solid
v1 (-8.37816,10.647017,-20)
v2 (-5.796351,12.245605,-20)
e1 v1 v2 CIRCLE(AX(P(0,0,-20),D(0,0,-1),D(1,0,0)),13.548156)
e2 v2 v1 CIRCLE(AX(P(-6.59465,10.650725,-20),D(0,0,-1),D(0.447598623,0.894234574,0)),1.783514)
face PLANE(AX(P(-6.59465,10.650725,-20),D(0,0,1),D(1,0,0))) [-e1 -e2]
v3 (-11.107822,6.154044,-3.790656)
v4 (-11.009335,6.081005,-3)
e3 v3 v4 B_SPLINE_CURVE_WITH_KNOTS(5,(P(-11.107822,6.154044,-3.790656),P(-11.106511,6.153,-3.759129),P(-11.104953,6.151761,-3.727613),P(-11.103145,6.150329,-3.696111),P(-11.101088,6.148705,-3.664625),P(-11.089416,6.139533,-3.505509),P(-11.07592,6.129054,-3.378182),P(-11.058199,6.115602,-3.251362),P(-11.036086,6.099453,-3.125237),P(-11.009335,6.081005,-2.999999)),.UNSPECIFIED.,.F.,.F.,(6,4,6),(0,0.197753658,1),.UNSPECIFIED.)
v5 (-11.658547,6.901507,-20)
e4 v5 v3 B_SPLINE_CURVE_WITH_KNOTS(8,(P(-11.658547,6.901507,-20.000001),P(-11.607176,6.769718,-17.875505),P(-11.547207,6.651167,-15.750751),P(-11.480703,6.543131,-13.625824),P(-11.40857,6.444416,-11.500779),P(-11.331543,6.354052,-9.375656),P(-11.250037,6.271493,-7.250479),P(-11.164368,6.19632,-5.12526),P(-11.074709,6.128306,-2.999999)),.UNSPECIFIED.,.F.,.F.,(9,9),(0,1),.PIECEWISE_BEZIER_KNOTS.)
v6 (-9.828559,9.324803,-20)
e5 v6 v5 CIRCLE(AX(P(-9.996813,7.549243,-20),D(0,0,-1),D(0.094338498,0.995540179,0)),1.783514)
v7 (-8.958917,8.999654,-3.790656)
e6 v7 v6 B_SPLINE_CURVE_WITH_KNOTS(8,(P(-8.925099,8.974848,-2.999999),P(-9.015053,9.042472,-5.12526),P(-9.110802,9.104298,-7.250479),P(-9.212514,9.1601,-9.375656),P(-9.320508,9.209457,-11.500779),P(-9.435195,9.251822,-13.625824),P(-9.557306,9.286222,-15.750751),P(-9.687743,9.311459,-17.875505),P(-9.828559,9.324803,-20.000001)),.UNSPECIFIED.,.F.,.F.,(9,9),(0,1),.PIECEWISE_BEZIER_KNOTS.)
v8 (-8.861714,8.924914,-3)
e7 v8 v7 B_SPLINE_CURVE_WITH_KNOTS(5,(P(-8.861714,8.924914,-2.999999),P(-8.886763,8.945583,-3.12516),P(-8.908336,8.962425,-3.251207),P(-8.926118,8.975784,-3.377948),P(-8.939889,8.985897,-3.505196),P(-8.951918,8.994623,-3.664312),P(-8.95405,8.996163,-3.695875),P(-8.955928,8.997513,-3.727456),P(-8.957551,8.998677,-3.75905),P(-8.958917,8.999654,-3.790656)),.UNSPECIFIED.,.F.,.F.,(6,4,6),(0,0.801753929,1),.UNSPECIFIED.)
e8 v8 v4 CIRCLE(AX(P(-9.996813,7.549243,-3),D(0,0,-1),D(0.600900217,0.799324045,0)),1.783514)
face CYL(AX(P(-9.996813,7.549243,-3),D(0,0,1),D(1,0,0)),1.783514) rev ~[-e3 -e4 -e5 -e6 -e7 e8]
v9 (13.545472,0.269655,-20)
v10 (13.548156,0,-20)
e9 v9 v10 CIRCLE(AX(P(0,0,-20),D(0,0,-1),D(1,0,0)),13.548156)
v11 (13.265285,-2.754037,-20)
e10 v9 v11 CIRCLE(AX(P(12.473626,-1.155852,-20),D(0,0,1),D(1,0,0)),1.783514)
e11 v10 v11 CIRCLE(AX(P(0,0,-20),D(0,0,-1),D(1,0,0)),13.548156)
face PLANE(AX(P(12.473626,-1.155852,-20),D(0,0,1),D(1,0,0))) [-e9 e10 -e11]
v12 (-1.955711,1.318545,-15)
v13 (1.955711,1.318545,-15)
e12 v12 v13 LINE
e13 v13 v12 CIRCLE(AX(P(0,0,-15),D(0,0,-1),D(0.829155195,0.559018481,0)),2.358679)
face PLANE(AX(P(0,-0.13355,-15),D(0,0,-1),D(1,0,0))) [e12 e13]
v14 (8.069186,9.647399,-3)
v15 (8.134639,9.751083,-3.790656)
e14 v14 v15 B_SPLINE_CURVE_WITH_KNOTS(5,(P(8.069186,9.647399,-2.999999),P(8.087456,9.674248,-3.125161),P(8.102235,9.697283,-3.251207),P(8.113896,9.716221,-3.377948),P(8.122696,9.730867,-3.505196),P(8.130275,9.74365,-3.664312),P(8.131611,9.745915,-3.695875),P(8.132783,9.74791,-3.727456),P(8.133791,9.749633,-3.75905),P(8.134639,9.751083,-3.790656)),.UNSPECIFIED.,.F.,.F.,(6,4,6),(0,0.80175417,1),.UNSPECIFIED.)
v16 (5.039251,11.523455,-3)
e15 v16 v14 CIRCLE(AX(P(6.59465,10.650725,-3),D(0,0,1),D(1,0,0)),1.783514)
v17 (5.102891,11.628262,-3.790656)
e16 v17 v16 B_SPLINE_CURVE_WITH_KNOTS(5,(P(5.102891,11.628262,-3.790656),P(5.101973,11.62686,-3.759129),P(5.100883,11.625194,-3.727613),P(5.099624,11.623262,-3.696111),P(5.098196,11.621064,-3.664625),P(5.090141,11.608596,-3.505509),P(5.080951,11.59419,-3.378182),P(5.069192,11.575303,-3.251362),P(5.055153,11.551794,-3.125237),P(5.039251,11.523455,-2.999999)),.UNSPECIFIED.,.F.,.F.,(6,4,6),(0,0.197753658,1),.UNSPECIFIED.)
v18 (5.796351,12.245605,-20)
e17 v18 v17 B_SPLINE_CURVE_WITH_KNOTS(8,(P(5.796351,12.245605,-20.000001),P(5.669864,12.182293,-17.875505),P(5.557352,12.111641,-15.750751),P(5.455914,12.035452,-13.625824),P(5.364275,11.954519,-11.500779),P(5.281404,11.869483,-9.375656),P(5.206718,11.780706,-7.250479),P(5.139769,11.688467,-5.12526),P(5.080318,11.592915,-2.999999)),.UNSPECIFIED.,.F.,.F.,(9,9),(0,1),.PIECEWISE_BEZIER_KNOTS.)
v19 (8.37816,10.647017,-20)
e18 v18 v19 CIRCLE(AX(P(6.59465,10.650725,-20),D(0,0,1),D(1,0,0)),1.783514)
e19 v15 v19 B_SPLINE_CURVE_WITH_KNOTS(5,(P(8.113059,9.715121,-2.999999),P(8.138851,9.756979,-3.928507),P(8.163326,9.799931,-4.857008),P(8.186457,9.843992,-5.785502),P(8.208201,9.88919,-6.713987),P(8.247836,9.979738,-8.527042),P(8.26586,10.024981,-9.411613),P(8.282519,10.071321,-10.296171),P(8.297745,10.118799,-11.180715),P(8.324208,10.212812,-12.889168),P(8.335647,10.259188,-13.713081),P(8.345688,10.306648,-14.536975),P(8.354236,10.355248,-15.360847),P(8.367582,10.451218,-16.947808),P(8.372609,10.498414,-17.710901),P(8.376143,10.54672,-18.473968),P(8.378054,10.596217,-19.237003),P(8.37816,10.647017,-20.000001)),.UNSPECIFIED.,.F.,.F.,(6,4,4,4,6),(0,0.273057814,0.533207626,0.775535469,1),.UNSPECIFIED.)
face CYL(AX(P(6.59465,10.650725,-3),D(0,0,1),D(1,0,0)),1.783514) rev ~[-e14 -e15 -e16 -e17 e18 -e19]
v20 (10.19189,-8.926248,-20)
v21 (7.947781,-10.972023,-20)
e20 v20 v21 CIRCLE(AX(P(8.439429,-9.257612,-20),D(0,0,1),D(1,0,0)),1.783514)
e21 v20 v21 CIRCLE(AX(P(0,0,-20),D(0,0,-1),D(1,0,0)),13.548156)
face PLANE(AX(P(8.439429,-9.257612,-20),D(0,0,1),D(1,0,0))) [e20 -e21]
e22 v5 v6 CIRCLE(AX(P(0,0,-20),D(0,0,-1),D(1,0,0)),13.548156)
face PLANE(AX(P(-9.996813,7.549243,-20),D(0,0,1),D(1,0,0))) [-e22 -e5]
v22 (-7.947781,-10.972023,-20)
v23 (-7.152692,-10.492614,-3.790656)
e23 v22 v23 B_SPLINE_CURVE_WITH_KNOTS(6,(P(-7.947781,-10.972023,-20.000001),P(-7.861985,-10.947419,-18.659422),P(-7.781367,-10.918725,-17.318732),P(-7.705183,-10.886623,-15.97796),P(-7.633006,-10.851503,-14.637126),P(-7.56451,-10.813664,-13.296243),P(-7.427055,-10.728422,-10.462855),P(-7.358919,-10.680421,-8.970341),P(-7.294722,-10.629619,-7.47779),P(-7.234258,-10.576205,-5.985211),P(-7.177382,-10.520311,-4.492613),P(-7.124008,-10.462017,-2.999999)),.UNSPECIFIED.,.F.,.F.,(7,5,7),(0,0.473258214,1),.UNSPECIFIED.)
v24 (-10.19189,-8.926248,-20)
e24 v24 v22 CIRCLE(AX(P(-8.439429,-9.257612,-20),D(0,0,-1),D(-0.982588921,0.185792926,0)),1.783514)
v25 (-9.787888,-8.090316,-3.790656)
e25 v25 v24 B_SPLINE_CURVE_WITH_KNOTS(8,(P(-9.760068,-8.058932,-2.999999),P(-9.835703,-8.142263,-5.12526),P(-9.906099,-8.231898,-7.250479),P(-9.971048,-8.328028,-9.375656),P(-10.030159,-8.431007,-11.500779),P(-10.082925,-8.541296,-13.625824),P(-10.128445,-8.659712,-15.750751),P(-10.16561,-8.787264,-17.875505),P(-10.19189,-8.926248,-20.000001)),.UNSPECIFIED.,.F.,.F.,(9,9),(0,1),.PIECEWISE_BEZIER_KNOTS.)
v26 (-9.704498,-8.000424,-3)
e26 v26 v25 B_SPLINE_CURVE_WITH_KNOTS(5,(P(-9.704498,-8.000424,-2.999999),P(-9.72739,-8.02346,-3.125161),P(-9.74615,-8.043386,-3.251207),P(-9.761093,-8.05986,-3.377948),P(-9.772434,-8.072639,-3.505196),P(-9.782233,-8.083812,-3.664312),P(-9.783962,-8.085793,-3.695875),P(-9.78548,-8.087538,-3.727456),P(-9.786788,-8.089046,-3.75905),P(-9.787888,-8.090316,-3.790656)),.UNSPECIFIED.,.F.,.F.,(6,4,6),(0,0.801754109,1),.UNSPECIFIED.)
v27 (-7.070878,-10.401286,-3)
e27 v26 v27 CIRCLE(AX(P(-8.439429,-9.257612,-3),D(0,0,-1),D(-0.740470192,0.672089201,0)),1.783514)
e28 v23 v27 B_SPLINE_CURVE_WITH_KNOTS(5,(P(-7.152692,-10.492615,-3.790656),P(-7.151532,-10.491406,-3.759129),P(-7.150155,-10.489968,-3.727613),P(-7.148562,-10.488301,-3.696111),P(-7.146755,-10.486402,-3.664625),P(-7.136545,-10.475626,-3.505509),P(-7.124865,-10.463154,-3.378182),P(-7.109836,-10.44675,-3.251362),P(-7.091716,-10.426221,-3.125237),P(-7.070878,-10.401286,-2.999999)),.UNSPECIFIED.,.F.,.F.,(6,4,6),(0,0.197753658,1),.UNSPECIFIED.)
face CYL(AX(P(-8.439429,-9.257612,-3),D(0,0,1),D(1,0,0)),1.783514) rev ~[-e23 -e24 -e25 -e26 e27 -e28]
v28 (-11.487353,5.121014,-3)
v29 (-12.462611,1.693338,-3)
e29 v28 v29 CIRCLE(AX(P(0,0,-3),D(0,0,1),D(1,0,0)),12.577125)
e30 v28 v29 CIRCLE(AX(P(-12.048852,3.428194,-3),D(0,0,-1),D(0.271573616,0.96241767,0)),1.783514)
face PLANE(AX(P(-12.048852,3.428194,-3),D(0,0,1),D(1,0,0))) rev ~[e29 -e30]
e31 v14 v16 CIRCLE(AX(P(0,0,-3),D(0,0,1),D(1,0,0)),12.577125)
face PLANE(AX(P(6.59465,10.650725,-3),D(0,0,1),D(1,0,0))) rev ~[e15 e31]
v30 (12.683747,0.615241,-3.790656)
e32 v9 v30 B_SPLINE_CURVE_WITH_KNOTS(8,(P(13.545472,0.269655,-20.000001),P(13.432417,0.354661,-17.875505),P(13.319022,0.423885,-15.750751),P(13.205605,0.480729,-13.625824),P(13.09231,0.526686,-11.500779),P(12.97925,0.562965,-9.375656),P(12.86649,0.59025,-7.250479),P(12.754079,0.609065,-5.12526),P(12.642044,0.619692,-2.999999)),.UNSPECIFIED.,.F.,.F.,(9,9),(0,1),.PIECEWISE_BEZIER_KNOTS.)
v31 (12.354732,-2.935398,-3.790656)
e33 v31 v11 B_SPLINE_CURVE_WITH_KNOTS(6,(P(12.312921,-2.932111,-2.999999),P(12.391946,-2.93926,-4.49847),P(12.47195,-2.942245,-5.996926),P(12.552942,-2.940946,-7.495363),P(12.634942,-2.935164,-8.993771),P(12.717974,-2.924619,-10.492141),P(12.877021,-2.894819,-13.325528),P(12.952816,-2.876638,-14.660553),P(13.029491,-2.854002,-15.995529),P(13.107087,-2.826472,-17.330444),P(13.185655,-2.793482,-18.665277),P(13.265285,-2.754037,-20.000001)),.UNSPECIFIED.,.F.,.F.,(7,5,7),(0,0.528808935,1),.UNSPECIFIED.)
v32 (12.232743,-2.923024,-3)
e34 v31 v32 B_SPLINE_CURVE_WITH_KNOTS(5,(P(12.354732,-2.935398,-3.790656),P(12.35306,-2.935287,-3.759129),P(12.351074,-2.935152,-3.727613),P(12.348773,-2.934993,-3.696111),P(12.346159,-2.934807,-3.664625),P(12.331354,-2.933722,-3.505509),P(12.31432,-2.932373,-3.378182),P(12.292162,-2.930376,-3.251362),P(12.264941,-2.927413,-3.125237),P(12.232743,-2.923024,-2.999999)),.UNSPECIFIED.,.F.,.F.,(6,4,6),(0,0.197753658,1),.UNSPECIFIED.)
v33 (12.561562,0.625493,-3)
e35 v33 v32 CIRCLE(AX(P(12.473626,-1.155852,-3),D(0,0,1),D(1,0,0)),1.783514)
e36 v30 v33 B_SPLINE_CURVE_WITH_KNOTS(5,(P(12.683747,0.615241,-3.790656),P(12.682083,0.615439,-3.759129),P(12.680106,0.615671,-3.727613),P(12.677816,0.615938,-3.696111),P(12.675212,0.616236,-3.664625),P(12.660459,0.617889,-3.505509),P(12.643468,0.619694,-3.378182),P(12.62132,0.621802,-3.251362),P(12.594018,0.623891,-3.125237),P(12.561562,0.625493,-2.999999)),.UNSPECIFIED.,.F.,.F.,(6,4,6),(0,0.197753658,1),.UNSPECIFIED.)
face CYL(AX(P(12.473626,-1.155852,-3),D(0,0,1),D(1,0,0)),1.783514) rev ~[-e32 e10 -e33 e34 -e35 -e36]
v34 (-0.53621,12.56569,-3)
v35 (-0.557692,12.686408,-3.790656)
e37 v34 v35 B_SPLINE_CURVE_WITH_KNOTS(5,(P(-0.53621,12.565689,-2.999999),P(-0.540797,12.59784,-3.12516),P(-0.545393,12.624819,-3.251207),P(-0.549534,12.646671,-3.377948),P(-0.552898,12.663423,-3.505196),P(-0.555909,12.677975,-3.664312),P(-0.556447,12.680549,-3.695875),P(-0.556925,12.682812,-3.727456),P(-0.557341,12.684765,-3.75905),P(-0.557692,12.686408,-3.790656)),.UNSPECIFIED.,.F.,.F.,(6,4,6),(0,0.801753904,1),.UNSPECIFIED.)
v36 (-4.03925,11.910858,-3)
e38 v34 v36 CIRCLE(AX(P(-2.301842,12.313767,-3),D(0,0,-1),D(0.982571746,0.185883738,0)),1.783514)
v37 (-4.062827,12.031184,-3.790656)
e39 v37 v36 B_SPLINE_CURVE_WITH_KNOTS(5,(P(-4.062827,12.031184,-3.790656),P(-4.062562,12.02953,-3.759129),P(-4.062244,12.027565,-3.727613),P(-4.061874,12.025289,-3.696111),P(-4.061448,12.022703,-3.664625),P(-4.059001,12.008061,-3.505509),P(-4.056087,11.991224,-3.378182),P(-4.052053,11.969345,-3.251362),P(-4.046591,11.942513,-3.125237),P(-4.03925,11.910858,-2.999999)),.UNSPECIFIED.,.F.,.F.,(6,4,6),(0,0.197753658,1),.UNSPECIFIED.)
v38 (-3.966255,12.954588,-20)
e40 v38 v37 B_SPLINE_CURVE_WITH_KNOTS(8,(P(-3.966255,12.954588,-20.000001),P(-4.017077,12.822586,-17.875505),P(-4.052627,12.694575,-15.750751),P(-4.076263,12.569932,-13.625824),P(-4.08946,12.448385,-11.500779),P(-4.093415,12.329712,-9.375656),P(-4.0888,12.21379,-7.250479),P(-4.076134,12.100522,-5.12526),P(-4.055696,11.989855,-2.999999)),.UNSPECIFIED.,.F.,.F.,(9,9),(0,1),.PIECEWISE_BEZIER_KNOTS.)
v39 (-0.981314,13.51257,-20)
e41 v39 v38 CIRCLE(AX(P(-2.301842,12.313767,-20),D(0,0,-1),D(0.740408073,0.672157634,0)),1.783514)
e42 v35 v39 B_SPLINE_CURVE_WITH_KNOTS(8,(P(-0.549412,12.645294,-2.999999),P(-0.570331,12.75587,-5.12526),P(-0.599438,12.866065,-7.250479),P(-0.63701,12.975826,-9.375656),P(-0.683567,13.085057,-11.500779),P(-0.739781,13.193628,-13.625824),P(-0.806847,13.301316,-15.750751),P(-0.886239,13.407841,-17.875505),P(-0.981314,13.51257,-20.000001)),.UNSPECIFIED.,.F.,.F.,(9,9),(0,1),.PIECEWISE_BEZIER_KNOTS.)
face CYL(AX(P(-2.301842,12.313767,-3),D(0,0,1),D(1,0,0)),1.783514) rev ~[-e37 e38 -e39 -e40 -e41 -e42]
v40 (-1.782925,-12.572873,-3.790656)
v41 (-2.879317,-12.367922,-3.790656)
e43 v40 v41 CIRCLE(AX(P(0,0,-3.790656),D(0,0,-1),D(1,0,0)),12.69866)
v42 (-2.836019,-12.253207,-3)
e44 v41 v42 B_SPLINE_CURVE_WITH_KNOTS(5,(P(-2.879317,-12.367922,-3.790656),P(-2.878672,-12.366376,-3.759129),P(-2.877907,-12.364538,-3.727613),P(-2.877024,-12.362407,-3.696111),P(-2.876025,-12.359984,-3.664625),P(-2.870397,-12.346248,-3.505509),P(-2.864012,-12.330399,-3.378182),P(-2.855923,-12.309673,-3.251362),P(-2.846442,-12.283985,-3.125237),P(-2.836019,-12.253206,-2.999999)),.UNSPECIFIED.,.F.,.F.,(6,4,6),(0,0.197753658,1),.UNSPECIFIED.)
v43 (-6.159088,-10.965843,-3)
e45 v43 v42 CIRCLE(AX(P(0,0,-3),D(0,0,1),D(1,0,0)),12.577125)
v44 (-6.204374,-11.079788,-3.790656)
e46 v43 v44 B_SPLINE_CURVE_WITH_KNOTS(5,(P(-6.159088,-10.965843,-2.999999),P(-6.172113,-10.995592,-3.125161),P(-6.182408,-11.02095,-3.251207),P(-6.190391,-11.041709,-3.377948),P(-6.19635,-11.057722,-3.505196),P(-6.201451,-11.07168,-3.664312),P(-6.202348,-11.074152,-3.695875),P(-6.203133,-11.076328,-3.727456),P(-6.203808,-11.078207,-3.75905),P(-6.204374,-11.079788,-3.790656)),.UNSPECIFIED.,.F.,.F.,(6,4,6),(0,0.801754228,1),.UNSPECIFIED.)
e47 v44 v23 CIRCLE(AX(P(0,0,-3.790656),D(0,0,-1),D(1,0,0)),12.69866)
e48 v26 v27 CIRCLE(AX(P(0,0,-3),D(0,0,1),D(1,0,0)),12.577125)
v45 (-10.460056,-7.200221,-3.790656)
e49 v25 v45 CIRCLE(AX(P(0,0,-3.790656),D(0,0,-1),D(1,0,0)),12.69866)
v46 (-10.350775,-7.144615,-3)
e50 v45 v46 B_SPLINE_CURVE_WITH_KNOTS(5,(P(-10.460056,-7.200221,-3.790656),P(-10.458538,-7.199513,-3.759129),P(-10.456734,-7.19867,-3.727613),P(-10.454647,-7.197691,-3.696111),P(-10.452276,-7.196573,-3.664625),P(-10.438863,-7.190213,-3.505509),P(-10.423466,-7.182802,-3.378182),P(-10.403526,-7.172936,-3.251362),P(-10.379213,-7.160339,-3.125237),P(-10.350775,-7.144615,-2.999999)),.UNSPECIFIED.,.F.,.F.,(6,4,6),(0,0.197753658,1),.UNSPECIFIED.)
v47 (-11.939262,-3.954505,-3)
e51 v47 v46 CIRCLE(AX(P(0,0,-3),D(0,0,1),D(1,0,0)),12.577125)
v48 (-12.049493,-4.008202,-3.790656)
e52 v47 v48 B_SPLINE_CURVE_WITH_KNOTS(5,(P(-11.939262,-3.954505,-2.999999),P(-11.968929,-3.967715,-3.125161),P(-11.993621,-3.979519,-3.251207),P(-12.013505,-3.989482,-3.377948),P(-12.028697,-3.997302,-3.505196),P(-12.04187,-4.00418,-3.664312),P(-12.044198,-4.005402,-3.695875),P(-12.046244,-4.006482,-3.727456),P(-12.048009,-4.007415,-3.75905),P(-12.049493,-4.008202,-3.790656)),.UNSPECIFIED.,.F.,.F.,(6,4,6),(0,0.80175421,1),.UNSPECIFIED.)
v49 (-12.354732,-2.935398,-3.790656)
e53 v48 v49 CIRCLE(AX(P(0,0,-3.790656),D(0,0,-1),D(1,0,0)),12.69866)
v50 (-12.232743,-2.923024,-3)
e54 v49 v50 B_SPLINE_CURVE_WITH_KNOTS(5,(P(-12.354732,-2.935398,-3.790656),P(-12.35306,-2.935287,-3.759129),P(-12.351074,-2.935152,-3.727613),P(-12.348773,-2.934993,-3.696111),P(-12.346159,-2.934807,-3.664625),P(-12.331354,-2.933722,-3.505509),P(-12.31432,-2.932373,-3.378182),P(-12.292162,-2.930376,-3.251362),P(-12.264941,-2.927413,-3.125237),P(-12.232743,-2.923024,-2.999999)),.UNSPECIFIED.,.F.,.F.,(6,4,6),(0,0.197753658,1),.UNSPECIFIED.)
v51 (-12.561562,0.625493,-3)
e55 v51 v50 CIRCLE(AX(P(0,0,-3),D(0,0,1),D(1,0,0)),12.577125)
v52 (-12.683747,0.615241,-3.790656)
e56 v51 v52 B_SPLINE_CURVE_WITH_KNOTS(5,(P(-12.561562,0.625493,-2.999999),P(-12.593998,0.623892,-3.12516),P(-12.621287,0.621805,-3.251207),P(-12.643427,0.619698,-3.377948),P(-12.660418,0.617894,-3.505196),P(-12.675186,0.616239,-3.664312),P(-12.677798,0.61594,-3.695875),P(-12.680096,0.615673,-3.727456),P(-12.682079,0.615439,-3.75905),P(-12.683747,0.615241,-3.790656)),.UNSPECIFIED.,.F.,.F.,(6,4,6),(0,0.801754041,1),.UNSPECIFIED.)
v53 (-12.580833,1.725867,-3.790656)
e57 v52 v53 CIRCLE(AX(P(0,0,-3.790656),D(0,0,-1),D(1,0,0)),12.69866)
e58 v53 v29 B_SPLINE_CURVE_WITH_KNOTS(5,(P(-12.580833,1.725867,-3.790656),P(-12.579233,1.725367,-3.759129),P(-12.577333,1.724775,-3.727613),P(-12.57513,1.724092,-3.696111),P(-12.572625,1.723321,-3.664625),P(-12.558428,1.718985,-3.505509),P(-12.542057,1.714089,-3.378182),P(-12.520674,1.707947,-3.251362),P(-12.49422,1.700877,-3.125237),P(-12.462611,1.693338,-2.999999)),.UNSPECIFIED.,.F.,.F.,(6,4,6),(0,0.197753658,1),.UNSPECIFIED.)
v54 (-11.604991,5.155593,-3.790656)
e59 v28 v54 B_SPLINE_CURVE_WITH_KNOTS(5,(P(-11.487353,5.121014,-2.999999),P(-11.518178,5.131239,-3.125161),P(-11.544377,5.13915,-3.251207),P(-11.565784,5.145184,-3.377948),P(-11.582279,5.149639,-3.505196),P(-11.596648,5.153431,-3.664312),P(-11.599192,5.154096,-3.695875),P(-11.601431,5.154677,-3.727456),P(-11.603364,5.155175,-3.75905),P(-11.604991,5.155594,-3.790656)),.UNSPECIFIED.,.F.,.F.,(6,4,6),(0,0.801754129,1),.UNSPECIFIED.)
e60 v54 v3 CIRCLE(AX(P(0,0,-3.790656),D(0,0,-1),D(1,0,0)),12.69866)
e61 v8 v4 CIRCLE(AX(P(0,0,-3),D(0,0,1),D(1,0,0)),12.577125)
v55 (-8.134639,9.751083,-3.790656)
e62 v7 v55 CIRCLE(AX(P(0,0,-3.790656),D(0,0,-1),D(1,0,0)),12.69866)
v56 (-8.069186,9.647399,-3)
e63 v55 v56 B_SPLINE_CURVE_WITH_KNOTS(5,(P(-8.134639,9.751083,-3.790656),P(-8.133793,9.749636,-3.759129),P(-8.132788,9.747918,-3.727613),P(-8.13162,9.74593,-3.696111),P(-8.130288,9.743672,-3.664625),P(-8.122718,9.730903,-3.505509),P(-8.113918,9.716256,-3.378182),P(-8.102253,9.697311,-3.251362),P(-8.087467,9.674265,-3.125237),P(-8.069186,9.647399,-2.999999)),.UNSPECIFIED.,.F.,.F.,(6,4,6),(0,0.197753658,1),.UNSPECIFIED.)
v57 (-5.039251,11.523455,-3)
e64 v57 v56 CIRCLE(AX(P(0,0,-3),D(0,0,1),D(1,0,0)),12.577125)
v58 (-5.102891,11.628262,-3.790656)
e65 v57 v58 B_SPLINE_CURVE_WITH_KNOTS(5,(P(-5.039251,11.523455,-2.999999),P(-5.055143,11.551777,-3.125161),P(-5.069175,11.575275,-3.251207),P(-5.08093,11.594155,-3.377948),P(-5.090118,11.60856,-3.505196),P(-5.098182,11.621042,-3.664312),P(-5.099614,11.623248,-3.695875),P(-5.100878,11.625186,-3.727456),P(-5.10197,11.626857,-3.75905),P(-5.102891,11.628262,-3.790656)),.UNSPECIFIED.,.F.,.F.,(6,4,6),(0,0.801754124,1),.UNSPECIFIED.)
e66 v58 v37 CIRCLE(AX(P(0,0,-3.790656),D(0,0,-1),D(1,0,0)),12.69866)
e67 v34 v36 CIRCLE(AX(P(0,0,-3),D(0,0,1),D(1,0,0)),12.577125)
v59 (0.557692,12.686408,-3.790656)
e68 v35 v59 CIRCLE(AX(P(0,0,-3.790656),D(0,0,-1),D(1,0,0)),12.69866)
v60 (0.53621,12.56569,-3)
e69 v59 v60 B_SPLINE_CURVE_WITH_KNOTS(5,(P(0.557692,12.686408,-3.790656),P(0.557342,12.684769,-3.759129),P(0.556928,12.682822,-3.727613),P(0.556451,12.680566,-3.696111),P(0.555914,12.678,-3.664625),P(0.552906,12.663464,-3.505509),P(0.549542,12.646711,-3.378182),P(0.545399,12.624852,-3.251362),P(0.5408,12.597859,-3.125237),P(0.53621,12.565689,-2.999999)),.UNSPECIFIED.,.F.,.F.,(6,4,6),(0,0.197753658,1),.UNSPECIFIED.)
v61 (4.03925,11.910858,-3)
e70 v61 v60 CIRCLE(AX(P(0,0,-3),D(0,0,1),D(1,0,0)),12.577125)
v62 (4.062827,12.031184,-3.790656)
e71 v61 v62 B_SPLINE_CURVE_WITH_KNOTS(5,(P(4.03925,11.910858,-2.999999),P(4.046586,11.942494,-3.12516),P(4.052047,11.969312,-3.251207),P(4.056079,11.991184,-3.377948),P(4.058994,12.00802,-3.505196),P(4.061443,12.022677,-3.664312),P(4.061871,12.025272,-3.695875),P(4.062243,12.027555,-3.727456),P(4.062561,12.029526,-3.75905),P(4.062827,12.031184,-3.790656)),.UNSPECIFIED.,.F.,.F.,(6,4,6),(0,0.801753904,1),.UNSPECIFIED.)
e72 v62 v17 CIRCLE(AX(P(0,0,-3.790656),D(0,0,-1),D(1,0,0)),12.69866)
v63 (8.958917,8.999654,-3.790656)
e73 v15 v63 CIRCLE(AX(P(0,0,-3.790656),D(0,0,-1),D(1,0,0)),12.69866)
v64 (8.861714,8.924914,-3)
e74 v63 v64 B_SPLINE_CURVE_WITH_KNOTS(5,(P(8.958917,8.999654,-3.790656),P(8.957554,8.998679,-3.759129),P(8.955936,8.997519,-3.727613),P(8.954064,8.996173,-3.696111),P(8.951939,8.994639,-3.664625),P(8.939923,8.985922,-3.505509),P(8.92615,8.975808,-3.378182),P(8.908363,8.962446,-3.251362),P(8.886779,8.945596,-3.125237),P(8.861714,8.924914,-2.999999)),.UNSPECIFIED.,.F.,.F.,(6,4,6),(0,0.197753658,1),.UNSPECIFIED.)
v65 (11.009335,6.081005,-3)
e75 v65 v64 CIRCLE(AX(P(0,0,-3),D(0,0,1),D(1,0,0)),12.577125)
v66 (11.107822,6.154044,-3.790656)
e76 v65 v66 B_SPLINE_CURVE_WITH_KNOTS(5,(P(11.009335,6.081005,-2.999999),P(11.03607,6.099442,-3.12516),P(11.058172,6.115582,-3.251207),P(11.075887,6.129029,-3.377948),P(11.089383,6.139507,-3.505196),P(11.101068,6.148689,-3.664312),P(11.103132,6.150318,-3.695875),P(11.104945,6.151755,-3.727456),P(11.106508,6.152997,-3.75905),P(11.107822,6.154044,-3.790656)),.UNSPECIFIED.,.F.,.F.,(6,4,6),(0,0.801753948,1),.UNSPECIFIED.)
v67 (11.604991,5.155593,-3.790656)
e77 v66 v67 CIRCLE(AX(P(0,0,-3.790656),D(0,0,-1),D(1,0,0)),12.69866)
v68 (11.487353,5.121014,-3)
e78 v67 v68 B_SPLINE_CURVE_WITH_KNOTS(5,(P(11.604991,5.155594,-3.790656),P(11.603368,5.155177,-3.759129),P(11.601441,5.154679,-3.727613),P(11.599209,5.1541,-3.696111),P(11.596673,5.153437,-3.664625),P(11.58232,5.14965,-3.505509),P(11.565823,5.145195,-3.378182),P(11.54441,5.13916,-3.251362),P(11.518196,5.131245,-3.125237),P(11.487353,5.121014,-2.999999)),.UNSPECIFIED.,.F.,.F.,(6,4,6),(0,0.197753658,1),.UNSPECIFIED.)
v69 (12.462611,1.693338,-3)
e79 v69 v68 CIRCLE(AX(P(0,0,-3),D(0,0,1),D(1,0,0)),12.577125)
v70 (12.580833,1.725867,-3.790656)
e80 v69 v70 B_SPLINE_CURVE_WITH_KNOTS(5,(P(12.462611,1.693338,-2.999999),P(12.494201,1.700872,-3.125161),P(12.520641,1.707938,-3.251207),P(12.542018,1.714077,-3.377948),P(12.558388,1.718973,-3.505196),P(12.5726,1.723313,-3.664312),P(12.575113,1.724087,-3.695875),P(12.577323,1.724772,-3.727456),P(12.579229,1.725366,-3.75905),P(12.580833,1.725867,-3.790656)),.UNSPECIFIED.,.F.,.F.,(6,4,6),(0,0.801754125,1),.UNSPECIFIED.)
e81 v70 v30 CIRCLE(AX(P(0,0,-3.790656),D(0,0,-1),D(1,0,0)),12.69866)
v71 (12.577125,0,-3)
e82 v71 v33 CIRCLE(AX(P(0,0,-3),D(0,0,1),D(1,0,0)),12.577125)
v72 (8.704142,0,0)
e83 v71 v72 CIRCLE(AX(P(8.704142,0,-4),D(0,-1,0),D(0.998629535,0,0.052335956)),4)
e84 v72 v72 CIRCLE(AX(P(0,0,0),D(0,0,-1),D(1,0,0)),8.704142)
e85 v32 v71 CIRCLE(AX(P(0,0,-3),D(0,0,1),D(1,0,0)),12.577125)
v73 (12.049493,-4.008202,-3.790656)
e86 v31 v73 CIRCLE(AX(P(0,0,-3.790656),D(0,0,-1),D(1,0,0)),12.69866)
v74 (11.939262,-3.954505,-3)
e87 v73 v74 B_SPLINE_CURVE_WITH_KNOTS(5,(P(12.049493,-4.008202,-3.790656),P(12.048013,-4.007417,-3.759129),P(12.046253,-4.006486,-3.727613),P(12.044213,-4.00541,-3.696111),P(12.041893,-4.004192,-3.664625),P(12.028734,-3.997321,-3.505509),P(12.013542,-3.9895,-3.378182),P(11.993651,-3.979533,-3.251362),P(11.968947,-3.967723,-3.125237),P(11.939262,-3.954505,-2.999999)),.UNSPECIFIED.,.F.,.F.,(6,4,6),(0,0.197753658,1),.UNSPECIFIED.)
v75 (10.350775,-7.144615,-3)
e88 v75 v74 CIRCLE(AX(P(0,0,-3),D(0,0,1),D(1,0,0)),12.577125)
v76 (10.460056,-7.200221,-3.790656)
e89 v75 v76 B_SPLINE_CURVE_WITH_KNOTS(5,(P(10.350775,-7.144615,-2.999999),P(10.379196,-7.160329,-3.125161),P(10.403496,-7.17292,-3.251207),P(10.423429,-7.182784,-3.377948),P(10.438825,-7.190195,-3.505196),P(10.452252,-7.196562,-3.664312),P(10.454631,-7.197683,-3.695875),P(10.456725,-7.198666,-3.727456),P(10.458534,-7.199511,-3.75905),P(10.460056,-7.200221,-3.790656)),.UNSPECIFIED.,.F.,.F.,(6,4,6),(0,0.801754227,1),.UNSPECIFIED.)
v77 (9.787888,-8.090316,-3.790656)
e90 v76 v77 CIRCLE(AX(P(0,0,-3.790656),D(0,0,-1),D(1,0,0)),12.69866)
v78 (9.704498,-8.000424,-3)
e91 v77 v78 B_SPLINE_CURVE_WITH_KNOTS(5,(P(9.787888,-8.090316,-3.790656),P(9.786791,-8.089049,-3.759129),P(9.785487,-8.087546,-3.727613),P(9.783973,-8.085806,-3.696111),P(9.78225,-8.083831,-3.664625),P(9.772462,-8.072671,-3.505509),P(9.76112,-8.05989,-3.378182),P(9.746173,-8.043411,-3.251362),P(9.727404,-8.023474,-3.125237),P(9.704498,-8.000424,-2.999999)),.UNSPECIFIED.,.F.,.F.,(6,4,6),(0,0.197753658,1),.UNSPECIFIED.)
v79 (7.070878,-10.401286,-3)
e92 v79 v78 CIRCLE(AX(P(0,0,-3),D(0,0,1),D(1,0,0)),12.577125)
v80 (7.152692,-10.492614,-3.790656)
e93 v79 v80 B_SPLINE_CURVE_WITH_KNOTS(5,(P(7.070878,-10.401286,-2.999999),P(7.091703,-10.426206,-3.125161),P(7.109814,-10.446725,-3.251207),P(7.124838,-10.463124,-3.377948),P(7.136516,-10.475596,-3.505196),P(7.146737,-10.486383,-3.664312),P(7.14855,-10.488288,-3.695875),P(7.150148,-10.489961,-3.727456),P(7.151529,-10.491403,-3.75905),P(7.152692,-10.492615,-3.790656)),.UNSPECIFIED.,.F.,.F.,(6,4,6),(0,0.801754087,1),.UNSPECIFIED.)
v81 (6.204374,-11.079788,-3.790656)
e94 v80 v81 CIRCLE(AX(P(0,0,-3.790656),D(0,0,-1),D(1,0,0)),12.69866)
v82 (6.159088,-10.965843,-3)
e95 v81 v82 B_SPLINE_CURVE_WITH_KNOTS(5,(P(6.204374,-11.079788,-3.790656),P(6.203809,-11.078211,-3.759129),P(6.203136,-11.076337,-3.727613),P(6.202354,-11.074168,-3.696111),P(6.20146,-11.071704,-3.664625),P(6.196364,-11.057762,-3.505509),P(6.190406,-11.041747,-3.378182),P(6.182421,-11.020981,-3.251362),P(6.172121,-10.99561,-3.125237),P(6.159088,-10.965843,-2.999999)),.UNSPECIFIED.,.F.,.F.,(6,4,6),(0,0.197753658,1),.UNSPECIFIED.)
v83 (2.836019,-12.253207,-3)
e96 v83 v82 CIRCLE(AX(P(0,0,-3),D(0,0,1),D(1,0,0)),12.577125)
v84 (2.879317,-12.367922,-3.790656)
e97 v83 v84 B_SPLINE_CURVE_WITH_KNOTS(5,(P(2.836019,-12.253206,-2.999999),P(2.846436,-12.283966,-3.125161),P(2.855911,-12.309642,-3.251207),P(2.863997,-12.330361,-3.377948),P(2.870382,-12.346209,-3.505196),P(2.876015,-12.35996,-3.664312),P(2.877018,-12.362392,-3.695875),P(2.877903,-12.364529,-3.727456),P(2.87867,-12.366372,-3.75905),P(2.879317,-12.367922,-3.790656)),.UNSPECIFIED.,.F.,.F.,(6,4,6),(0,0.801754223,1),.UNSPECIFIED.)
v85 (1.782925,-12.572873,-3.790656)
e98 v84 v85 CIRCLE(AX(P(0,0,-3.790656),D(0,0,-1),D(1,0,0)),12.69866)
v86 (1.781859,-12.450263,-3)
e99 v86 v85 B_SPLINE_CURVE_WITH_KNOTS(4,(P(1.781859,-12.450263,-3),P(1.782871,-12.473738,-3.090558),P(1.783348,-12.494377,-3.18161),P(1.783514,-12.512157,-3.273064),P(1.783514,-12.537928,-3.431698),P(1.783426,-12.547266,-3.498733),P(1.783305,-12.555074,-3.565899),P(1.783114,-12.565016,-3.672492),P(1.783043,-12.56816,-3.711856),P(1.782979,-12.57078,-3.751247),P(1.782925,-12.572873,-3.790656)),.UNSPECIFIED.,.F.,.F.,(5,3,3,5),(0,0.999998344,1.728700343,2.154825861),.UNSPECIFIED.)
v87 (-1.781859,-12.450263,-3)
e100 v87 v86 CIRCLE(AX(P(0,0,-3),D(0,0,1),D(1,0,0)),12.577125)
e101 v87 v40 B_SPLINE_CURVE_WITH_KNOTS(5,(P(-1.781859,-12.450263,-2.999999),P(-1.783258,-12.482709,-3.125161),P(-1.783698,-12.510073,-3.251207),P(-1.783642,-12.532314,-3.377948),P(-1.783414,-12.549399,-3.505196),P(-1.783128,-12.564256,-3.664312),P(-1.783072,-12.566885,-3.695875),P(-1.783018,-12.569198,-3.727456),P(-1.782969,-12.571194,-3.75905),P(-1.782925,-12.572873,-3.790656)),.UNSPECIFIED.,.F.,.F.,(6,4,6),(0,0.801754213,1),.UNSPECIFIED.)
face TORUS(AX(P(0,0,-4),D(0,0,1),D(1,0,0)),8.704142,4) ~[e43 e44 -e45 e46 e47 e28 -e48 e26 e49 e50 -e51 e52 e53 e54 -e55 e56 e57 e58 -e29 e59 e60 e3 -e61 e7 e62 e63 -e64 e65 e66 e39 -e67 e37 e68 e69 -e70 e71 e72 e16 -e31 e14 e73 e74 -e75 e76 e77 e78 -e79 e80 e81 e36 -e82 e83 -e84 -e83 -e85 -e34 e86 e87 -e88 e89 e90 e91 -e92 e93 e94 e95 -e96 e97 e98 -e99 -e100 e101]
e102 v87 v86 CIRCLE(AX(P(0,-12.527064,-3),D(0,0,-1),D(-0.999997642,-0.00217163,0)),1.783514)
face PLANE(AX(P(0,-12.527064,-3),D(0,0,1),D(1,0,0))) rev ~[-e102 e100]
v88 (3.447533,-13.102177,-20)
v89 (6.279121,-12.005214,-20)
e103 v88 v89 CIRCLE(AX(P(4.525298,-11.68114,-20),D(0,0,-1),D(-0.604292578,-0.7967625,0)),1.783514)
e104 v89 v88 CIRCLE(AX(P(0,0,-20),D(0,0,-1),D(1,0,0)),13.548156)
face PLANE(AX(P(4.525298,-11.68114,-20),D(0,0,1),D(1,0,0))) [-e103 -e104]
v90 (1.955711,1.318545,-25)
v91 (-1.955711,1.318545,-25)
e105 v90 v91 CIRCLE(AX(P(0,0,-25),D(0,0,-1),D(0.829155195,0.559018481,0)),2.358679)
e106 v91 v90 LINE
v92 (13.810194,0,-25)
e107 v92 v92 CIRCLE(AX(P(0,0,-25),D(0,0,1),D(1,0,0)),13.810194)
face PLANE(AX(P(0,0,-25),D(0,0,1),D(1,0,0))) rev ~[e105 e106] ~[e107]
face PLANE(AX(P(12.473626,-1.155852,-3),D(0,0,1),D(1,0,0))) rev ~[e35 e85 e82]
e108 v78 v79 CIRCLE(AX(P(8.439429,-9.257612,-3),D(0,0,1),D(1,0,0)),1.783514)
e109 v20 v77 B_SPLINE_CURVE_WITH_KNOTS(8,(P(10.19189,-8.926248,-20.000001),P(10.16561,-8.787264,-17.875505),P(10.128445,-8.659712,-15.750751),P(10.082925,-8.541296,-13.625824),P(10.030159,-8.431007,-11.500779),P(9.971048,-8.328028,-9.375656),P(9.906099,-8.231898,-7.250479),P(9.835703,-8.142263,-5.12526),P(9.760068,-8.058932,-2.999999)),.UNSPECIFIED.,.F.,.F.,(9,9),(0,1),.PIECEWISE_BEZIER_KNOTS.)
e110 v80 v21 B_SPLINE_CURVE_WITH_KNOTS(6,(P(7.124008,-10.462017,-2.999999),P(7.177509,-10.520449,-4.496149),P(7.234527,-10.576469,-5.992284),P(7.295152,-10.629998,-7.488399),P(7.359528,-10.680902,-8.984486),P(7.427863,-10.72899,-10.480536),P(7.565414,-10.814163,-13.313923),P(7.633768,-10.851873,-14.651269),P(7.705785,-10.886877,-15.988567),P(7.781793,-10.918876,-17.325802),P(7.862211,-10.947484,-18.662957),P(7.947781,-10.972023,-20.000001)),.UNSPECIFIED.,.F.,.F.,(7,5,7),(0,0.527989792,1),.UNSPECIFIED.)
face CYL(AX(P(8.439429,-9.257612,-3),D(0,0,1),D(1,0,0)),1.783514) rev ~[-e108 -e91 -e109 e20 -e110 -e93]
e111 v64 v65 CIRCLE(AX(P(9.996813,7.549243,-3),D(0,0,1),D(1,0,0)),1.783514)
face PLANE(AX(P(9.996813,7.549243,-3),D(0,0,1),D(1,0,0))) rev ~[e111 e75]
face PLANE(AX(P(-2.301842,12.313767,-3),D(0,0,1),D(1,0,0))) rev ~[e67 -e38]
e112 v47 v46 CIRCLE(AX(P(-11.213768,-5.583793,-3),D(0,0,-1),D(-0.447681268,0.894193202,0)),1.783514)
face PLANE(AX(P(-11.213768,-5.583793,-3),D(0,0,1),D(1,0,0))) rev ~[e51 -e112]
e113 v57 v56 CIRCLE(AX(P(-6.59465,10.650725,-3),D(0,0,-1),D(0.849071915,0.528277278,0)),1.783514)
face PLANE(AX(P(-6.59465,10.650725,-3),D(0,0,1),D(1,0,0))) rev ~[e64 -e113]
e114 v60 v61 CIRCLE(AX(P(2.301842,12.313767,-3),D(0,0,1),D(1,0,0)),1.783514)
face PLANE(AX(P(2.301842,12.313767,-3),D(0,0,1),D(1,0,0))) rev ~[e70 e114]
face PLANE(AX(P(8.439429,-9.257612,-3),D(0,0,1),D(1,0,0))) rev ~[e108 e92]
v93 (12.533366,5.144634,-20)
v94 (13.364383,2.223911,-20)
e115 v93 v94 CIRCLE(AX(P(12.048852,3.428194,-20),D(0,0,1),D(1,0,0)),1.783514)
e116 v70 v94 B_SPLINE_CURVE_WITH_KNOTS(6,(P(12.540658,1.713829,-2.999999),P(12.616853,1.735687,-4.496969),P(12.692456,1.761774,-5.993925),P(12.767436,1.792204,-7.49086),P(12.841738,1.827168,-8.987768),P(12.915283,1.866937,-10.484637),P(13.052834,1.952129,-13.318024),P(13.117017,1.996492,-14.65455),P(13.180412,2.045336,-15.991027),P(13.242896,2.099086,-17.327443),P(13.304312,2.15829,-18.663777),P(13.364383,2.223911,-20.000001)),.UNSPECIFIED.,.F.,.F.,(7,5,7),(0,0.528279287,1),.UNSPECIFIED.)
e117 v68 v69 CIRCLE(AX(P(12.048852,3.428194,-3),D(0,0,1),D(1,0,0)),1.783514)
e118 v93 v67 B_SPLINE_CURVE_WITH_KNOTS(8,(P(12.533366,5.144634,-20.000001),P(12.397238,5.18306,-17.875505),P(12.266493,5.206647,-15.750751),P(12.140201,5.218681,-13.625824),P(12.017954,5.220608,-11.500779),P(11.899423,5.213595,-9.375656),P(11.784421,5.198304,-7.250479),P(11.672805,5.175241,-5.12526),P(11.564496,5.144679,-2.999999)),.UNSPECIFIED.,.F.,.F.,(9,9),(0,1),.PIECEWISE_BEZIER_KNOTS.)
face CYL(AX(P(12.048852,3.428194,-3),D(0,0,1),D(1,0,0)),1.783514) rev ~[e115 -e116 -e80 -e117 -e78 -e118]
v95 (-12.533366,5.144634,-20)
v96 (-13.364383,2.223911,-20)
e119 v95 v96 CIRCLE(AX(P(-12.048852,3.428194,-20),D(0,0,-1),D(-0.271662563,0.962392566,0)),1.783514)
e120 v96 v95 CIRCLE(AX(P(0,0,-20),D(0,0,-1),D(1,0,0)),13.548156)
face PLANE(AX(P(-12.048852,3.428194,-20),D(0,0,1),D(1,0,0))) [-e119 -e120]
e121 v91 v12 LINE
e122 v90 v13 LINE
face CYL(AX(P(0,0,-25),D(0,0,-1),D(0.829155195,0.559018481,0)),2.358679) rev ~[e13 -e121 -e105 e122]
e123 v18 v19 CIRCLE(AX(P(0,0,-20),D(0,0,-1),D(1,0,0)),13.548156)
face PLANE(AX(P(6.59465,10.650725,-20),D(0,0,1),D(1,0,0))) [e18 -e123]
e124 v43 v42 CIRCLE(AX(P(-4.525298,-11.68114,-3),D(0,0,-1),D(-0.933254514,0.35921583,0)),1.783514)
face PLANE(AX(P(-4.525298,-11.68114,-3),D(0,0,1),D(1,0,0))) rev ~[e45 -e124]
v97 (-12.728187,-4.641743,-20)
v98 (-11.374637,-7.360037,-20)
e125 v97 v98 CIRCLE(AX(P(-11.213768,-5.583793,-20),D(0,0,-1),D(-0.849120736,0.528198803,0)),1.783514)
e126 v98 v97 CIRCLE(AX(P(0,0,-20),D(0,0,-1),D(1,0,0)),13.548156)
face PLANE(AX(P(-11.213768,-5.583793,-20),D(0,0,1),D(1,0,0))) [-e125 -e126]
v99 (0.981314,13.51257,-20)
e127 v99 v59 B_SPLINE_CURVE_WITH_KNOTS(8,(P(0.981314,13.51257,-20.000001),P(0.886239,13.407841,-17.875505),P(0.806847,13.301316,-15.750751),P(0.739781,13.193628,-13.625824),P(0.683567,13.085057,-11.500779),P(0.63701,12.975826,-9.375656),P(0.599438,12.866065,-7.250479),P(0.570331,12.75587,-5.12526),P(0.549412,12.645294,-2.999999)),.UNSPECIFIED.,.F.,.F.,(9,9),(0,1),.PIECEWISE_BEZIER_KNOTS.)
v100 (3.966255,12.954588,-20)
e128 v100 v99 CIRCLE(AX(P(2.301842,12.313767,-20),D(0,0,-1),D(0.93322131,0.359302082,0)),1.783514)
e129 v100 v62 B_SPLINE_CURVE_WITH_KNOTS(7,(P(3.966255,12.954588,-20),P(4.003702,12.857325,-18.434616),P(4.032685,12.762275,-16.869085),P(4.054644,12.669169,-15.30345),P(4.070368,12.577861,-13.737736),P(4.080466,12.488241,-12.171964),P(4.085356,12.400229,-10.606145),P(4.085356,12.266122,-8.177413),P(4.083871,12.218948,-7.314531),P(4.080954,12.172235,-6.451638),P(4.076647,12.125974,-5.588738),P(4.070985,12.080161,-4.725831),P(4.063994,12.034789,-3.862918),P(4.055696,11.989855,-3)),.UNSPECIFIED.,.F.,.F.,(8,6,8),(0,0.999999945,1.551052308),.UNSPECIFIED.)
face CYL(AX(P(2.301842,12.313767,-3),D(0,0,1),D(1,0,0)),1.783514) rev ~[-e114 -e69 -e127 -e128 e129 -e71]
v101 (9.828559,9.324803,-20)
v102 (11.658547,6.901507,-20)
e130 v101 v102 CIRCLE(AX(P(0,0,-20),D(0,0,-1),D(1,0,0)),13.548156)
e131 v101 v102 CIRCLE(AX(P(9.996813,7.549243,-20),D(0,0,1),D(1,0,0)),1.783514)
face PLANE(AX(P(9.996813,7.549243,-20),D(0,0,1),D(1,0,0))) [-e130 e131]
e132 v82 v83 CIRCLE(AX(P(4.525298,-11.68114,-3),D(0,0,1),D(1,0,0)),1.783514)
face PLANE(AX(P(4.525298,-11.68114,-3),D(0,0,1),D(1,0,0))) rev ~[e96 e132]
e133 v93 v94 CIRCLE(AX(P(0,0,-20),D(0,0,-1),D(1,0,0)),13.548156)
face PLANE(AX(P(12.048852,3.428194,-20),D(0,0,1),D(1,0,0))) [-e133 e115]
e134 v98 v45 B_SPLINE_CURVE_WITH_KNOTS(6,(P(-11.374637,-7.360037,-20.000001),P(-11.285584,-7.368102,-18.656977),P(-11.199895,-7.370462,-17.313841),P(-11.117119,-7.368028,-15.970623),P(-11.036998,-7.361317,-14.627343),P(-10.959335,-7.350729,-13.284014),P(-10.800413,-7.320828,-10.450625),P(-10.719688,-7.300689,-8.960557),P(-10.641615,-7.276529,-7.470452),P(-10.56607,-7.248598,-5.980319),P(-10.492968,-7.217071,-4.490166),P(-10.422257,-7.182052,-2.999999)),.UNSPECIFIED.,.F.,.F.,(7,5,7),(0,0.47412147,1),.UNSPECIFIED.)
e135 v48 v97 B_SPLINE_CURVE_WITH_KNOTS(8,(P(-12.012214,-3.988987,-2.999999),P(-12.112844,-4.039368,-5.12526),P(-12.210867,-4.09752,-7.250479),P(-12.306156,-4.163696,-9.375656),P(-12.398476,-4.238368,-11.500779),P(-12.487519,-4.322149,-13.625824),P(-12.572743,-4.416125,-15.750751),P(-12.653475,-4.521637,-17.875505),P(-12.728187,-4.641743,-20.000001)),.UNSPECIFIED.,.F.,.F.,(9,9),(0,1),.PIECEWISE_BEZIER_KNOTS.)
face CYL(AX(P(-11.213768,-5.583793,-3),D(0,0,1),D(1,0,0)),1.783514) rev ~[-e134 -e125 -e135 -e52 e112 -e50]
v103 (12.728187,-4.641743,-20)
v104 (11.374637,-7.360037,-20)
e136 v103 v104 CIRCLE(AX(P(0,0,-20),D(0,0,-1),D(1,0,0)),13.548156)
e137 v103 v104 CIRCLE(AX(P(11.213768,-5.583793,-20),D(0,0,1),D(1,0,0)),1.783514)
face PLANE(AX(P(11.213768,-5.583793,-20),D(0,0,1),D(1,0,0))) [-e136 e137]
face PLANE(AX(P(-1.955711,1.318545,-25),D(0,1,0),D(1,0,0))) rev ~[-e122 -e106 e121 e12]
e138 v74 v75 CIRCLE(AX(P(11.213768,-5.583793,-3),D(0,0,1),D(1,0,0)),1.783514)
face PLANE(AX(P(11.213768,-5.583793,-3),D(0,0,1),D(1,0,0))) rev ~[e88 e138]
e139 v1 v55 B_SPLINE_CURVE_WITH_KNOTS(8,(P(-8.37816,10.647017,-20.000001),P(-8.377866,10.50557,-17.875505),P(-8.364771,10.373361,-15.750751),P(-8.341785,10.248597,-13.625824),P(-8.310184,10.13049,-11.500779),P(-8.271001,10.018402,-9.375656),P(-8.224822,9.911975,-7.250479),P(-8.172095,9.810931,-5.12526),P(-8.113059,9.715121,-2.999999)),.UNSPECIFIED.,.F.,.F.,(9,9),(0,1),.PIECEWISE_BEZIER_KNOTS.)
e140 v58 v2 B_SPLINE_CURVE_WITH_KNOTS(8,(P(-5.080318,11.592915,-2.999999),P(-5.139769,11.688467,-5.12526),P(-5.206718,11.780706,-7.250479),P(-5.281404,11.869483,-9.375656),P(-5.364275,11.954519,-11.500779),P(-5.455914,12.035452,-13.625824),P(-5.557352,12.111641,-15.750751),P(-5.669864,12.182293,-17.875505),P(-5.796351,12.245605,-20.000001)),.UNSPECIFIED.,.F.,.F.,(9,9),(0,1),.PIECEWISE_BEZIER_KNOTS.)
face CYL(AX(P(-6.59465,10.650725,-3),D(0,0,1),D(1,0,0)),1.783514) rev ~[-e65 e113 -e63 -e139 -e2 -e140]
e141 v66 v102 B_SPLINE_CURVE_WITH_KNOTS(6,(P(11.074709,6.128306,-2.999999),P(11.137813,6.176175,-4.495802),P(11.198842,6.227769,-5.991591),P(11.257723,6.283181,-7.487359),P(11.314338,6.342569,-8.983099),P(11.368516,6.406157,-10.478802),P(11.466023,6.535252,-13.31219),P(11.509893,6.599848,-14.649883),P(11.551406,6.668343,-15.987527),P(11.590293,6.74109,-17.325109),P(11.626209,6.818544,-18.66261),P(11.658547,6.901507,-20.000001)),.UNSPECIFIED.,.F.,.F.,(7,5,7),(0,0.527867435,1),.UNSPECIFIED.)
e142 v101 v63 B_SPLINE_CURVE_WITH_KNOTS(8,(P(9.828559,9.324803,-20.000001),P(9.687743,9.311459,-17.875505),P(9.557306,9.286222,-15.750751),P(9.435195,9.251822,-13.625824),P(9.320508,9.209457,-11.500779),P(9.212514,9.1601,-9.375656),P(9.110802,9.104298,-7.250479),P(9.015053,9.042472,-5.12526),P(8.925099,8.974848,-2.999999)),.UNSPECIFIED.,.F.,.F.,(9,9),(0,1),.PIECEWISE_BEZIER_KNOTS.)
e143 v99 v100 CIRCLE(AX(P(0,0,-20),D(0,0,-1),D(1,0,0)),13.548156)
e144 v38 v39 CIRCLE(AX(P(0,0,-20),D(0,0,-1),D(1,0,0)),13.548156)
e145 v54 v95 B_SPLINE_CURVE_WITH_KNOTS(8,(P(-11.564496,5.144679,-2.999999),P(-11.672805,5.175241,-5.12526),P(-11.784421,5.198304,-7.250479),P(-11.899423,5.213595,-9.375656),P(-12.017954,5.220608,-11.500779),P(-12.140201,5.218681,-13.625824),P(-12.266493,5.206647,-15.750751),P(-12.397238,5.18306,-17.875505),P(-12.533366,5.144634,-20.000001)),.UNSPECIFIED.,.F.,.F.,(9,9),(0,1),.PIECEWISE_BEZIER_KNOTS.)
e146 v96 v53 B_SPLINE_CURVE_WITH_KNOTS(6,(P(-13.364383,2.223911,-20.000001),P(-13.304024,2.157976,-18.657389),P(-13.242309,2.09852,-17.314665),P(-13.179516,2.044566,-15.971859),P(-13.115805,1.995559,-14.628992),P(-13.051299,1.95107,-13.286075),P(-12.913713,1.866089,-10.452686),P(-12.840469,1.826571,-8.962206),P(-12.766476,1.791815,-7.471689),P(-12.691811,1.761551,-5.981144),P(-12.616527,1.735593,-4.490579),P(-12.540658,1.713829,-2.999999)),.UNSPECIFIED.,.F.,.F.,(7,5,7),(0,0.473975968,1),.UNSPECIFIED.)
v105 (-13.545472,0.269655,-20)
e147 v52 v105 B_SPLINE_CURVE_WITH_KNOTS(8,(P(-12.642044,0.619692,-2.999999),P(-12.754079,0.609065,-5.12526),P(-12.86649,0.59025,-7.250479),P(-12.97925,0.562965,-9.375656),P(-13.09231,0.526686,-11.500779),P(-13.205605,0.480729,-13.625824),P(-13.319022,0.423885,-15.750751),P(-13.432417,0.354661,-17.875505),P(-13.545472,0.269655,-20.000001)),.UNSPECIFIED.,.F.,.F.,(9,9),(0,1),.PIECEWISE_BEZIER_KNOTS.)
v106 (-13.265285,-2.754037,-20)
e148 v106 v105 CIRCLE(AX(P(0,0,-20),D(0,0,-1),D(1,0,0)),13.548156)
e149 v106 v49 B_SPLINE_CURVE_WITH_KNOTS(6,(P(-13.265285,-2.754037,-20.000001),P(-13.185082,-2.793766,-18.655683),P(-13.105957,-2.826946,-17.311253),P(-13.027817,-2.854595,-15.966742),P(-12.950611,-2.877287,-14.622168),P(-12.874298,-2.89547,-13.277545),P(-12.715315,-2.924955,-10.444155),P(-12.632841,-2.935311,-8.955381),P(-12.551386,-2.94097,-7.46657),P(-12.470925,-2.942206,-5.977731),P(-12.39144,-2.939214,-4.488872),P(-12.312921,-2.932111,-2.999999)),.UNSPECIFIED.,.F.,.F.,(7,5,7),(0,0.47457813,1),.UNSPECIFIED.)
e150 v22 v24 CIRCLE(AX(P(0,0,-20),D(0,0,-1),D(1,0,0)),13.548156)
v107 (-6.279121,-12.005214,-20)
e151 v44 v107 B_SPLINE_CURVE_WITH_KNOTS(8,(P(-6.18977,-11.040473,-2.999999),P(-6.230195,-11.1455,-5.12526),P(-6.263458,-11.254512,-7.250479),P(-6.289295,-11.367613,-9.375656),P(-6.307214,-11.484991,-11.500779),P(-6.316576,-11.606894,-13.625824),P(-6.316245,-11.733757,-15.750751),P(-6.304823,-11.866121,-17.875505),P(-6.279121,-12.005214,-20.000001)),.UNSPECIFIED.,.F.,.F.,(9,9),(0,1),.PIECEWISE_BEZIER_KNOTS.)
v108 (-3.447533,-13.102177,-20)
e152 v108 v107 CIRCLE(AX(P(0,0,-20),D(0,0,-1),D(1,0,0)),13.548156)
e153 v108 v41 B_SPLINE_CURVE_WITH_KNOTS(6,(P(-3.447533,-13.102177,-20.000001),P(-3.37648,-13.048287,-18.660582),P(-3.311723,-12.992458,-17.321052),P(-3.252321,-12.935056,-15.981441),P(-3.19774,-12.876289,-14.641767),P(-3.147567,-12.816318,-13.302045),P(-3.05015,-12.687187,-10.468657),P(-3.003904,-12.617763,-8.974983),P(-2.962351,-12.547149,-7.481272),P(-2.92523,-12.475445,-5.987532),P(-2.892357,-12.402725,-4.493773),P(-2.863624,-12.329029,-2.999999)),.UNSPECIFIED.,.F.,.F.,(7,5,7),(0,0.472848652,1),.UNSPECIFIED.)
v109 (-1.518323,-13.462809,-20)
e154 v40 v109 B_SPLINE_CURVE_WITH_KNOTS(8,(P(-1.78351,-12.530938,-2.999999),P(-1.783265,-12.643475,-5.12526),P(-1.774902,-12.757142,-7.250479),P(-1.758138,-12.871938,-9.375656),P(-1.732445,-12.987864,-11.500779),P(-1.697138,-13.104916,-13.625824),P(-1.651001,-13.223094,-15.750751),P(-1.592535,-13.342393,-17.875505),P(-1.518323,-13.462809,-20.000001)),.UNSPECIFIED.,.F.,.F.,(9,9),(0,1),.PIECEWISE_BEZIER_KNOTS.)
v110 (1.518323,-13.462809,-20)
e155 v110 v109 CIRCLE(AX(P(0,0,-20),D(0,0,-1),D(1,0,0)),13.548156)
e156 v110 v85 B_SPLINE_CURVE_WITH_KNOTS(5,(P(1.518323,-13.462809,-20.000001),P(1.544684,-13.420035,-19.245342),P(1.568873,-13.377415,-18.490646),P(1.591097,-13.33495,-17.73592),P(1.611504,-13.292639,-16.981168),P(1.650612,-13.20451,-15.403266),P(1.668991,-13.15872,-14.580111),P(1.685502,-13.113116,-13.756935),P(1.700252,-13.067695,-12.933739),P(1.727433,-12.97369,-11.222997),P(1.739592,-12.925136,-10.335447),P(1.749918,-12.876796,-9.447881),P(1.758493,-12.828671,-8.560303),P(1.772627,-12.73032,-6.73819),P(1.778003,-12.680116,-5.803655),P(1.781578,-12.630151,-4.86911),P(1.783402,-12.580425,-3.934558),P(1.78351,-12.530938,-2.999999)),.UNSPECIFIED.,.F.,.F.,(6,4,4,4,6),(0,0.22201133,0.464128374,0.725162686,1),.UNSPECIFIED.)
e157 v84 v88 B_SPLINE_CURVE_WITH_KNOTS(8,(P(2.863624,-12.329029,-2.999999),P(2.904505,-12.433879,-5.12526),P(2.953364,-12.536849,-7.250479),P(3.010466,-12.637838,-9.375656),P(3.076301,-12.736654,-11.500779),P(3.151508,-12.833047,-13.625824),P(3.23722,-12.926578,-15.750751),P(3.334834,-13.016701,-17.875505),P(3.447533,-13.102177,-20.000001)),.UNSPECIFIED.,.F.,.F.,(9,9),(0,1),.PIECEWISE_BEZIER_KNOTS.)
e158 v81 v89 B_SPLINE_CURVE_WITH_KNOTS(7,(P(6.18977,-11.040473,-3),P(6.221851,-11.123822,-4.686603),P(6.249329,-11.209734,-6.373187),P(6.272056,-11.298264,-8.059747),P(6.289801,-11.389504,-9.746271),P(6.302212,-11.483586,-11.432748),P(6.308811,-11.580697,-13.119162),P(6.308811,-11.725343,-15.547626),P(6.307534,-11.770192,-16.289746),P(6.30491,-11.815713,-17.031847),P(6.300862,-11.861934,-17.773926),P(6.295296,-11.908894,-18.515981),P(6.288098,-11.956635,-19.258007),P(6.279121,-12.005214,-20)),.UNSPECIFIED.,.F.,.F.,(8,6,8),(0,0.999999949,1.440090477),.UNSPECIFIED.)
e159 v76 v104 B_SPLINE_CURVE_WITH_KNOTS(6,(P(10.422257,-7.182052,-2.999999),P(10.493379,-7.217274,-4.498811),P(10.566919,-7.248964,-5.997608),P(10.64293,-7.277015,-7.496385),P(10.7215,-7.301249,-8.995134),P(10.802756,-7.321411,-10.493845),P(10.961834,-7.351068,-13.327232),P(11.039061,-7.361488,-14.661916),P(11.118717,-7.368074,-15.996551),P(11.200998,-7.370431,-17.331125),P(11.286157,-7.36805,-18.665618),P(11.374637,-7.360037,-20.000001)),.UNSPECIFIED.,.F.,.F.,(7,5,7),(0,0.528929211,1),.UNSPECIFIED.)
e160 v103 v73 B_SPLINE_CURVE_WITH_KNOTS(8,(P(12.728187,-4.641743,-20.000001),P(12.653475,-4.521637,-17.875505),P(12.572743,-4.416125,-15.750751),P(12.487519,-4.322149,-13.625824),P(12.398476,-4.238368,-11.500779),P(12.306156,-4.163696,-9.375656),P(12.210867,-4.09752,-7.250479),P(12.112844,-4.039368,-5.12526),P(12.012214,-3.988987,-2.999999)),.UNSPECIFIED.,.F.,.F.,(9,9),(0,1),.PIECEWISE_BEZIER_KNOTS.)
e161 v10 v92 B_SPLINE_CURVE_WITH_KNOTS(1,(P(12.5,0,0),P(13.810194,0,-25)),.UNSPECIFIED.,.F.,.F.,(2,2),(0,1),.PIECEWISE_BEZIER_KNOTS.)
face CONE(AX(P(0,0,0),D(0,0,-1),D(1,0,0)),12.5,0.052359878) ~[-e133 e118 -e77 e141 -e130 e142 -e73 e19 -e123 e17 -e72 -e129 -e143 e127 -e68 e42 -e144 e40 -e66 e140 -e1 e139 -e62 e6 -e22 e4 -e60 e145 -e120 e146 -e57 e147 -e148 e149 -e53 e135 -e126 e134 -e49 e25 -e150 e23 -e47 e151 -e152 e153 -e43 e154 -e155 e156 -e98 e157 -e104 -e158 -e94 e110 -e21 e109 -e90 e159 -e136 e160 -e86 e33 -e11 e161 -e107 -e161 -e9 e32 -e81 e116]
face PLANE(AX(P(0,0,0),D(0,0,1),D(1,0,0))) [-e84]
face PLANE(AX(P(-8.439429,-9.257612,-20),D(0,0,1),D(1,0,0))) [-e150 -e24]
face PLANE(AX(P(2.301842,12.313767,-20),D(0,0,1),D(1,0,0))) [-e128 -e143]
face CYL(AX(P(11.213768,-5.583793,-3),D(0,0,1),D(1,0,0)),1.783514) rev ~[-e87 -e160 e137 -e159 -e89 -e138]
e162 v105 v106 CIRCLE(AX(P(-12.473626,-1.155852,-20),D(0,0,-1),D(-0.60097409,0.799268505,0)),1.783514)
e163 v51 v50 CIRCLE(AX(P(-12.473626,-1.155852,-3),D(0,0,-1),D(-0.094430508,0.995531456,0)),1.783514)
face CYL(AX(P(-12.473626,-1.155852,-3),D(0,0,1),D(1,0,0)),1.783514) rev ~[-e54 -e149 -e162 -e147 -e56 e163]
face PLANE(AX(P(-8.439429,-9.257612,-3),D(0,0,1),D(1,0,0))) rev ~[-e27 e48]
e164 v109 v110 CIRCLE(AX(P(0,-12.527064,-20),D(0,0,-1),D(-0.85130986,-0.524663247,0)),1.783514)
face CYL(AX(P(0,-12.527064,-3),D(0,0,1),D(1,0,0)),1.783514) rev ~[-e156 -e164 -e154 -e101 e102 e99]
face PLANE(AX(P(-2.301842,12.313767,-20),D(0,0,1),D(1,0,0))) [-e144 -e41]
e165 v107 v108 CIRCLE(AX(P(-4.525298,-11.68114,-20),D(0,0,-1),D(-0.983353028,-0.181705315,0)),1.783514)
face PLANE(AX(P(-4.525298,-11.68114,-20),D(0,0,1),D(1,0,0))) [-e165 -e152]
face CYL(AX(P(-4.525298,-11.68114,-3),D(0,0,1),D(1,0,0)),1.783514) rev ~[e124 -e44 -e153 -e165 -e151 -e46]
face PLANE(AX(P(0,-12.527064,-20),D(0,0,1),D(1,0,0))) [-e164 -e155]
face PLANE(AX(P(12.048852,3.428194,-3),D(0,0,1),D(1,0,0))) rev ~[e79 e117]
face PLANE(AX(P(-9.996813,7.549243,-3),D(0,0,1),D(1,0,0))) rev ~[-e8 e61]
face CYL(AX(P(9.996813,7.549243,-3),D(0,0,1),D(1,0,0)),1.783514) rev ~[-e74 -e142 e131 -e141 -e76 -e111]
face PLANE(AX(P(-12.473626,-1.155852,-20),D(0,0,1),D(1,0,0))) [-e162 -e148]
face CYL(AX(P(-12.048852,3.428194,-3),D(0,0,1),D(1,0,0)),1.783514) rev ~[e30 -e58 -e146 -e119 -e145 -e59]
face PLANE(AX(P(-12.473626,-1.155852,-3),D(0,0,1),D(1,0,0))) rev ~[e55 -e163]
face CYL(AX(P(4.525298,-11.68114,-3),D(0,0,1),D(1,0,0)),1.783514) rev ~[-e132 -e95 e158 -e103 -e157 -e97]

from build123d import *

# Parameters (mm, degrees)
F1_R     = 12.5
F2_DEPTH = 25
F2_TAPER = -3
F3_R     = 1.7835138624
F4_DEPTH = 17
F7_DEPTH = 10


# Not quite as in the source:
# - a fillet or chamfer that OpenCascade refuses, or shapes differently, is made with other operations: its cross-section is extruded or revolved along the edge and cut away or added


with BuildPart() as f2:
    # F1 (on Top) → F2 (new body)
    with BuildSketch(Plane.XY):
        Circle(F1_R)
    extrude(amount=-F2_DEPTH, taper=F2_TAPER)

    # F3 (on offset) → F4 (cut)
    with BuildSketch(Plane.XY.offset(-3)):
        with Locations((0, -12.5270644203)):
            Circle(F3_R)
        with Locations((4.5252976236, -11.6811396879)):
            Circle(F3_R)
        with Locations((8.4394287276, -9.2576123132)):
            Circle(F3_R)
        with Locations((11.2137682175, -5.5837930974)):
            Circle(F3_R)
        with Locations((12.4736261719, -1.155851683)):
            Circle(F3_R)
        with Locations((12.0488517931, 3.4281939061)):
            Circle(F3_R)
        with Locations((9.9968132146, 7.5492429118)):
            Circle(F3_R)
        with Locations((6.5946496173, 10.6507248305)):
            Circle(F3_R)
        with Locations((2.3018420469, 12.3137673431)):
            Circle(F3_R)
        with Locations((-2.3018420469, 12.3137673431)):
            Circle(F3_R)
        with Locations((-6.5946496173, 10.6507248305)):
            Circle(F3_R)
        with Locations((-9.9968132146, 7.5492429118)):
            Circle(F3_R)
        with Locations((-12.0488517931, 3.4281939061)):
            Circle(F3_R)
        with Locations((-12.4736261719, -1.155851683)):
            Circle(F3_R)
        with Locations((-11.2137682175, -5.5837930974)):
            Circle(F3_R)
        with Locations((-8.4394287276, -9.2576123132)):
            Circle(F3_R)
        with Locations((-4.5252976236, -11.6811396879)):
            Circle(F3_R)
    extrude(amount=-F4_DEPTH, mode=Mode.SUBTRACT)

    # F5: fillet of radius 4 on 1 edges, made by hand

    # F5_s1 → F5_t2 (revolve, cut)
    with BuildSketch(Plane.XZ):
        with BuildLine():
            ThreePointArc((12.6986598722, -3.790656175), (11.4575600359, -1.098502516), (8.7041417331, 0))
            Line((8.7041417331, 0), (12.5, 0))
            Line((12.5, 0), (12.6986598722, -3.790656175))
        make_face()
    revolve(axis=Axis((0, 0, 0), (0, 0, -1)), mode=Mode.SUBTRACT)

    # F6 (on face) → F7 (cut)
    with BuildSketch(Plane(origin=(0, 0, -25), x_dir=(1, 0, 0), z_dir=(0, 0, -1))):
        with BuildLine():
            Line((-1.9557109083, -1.3185451265), (1.9557109083, -1.3185451265))
            ThreePointArc((1.9557109083, -1.3185451265), (0, 2.3586789539), (-1.9557109083, -1.3185451265))
        make_face()
    extrude(amount=-F7_DEPTH, mode=Mode.SUBTRACT)


solid = f2.part
